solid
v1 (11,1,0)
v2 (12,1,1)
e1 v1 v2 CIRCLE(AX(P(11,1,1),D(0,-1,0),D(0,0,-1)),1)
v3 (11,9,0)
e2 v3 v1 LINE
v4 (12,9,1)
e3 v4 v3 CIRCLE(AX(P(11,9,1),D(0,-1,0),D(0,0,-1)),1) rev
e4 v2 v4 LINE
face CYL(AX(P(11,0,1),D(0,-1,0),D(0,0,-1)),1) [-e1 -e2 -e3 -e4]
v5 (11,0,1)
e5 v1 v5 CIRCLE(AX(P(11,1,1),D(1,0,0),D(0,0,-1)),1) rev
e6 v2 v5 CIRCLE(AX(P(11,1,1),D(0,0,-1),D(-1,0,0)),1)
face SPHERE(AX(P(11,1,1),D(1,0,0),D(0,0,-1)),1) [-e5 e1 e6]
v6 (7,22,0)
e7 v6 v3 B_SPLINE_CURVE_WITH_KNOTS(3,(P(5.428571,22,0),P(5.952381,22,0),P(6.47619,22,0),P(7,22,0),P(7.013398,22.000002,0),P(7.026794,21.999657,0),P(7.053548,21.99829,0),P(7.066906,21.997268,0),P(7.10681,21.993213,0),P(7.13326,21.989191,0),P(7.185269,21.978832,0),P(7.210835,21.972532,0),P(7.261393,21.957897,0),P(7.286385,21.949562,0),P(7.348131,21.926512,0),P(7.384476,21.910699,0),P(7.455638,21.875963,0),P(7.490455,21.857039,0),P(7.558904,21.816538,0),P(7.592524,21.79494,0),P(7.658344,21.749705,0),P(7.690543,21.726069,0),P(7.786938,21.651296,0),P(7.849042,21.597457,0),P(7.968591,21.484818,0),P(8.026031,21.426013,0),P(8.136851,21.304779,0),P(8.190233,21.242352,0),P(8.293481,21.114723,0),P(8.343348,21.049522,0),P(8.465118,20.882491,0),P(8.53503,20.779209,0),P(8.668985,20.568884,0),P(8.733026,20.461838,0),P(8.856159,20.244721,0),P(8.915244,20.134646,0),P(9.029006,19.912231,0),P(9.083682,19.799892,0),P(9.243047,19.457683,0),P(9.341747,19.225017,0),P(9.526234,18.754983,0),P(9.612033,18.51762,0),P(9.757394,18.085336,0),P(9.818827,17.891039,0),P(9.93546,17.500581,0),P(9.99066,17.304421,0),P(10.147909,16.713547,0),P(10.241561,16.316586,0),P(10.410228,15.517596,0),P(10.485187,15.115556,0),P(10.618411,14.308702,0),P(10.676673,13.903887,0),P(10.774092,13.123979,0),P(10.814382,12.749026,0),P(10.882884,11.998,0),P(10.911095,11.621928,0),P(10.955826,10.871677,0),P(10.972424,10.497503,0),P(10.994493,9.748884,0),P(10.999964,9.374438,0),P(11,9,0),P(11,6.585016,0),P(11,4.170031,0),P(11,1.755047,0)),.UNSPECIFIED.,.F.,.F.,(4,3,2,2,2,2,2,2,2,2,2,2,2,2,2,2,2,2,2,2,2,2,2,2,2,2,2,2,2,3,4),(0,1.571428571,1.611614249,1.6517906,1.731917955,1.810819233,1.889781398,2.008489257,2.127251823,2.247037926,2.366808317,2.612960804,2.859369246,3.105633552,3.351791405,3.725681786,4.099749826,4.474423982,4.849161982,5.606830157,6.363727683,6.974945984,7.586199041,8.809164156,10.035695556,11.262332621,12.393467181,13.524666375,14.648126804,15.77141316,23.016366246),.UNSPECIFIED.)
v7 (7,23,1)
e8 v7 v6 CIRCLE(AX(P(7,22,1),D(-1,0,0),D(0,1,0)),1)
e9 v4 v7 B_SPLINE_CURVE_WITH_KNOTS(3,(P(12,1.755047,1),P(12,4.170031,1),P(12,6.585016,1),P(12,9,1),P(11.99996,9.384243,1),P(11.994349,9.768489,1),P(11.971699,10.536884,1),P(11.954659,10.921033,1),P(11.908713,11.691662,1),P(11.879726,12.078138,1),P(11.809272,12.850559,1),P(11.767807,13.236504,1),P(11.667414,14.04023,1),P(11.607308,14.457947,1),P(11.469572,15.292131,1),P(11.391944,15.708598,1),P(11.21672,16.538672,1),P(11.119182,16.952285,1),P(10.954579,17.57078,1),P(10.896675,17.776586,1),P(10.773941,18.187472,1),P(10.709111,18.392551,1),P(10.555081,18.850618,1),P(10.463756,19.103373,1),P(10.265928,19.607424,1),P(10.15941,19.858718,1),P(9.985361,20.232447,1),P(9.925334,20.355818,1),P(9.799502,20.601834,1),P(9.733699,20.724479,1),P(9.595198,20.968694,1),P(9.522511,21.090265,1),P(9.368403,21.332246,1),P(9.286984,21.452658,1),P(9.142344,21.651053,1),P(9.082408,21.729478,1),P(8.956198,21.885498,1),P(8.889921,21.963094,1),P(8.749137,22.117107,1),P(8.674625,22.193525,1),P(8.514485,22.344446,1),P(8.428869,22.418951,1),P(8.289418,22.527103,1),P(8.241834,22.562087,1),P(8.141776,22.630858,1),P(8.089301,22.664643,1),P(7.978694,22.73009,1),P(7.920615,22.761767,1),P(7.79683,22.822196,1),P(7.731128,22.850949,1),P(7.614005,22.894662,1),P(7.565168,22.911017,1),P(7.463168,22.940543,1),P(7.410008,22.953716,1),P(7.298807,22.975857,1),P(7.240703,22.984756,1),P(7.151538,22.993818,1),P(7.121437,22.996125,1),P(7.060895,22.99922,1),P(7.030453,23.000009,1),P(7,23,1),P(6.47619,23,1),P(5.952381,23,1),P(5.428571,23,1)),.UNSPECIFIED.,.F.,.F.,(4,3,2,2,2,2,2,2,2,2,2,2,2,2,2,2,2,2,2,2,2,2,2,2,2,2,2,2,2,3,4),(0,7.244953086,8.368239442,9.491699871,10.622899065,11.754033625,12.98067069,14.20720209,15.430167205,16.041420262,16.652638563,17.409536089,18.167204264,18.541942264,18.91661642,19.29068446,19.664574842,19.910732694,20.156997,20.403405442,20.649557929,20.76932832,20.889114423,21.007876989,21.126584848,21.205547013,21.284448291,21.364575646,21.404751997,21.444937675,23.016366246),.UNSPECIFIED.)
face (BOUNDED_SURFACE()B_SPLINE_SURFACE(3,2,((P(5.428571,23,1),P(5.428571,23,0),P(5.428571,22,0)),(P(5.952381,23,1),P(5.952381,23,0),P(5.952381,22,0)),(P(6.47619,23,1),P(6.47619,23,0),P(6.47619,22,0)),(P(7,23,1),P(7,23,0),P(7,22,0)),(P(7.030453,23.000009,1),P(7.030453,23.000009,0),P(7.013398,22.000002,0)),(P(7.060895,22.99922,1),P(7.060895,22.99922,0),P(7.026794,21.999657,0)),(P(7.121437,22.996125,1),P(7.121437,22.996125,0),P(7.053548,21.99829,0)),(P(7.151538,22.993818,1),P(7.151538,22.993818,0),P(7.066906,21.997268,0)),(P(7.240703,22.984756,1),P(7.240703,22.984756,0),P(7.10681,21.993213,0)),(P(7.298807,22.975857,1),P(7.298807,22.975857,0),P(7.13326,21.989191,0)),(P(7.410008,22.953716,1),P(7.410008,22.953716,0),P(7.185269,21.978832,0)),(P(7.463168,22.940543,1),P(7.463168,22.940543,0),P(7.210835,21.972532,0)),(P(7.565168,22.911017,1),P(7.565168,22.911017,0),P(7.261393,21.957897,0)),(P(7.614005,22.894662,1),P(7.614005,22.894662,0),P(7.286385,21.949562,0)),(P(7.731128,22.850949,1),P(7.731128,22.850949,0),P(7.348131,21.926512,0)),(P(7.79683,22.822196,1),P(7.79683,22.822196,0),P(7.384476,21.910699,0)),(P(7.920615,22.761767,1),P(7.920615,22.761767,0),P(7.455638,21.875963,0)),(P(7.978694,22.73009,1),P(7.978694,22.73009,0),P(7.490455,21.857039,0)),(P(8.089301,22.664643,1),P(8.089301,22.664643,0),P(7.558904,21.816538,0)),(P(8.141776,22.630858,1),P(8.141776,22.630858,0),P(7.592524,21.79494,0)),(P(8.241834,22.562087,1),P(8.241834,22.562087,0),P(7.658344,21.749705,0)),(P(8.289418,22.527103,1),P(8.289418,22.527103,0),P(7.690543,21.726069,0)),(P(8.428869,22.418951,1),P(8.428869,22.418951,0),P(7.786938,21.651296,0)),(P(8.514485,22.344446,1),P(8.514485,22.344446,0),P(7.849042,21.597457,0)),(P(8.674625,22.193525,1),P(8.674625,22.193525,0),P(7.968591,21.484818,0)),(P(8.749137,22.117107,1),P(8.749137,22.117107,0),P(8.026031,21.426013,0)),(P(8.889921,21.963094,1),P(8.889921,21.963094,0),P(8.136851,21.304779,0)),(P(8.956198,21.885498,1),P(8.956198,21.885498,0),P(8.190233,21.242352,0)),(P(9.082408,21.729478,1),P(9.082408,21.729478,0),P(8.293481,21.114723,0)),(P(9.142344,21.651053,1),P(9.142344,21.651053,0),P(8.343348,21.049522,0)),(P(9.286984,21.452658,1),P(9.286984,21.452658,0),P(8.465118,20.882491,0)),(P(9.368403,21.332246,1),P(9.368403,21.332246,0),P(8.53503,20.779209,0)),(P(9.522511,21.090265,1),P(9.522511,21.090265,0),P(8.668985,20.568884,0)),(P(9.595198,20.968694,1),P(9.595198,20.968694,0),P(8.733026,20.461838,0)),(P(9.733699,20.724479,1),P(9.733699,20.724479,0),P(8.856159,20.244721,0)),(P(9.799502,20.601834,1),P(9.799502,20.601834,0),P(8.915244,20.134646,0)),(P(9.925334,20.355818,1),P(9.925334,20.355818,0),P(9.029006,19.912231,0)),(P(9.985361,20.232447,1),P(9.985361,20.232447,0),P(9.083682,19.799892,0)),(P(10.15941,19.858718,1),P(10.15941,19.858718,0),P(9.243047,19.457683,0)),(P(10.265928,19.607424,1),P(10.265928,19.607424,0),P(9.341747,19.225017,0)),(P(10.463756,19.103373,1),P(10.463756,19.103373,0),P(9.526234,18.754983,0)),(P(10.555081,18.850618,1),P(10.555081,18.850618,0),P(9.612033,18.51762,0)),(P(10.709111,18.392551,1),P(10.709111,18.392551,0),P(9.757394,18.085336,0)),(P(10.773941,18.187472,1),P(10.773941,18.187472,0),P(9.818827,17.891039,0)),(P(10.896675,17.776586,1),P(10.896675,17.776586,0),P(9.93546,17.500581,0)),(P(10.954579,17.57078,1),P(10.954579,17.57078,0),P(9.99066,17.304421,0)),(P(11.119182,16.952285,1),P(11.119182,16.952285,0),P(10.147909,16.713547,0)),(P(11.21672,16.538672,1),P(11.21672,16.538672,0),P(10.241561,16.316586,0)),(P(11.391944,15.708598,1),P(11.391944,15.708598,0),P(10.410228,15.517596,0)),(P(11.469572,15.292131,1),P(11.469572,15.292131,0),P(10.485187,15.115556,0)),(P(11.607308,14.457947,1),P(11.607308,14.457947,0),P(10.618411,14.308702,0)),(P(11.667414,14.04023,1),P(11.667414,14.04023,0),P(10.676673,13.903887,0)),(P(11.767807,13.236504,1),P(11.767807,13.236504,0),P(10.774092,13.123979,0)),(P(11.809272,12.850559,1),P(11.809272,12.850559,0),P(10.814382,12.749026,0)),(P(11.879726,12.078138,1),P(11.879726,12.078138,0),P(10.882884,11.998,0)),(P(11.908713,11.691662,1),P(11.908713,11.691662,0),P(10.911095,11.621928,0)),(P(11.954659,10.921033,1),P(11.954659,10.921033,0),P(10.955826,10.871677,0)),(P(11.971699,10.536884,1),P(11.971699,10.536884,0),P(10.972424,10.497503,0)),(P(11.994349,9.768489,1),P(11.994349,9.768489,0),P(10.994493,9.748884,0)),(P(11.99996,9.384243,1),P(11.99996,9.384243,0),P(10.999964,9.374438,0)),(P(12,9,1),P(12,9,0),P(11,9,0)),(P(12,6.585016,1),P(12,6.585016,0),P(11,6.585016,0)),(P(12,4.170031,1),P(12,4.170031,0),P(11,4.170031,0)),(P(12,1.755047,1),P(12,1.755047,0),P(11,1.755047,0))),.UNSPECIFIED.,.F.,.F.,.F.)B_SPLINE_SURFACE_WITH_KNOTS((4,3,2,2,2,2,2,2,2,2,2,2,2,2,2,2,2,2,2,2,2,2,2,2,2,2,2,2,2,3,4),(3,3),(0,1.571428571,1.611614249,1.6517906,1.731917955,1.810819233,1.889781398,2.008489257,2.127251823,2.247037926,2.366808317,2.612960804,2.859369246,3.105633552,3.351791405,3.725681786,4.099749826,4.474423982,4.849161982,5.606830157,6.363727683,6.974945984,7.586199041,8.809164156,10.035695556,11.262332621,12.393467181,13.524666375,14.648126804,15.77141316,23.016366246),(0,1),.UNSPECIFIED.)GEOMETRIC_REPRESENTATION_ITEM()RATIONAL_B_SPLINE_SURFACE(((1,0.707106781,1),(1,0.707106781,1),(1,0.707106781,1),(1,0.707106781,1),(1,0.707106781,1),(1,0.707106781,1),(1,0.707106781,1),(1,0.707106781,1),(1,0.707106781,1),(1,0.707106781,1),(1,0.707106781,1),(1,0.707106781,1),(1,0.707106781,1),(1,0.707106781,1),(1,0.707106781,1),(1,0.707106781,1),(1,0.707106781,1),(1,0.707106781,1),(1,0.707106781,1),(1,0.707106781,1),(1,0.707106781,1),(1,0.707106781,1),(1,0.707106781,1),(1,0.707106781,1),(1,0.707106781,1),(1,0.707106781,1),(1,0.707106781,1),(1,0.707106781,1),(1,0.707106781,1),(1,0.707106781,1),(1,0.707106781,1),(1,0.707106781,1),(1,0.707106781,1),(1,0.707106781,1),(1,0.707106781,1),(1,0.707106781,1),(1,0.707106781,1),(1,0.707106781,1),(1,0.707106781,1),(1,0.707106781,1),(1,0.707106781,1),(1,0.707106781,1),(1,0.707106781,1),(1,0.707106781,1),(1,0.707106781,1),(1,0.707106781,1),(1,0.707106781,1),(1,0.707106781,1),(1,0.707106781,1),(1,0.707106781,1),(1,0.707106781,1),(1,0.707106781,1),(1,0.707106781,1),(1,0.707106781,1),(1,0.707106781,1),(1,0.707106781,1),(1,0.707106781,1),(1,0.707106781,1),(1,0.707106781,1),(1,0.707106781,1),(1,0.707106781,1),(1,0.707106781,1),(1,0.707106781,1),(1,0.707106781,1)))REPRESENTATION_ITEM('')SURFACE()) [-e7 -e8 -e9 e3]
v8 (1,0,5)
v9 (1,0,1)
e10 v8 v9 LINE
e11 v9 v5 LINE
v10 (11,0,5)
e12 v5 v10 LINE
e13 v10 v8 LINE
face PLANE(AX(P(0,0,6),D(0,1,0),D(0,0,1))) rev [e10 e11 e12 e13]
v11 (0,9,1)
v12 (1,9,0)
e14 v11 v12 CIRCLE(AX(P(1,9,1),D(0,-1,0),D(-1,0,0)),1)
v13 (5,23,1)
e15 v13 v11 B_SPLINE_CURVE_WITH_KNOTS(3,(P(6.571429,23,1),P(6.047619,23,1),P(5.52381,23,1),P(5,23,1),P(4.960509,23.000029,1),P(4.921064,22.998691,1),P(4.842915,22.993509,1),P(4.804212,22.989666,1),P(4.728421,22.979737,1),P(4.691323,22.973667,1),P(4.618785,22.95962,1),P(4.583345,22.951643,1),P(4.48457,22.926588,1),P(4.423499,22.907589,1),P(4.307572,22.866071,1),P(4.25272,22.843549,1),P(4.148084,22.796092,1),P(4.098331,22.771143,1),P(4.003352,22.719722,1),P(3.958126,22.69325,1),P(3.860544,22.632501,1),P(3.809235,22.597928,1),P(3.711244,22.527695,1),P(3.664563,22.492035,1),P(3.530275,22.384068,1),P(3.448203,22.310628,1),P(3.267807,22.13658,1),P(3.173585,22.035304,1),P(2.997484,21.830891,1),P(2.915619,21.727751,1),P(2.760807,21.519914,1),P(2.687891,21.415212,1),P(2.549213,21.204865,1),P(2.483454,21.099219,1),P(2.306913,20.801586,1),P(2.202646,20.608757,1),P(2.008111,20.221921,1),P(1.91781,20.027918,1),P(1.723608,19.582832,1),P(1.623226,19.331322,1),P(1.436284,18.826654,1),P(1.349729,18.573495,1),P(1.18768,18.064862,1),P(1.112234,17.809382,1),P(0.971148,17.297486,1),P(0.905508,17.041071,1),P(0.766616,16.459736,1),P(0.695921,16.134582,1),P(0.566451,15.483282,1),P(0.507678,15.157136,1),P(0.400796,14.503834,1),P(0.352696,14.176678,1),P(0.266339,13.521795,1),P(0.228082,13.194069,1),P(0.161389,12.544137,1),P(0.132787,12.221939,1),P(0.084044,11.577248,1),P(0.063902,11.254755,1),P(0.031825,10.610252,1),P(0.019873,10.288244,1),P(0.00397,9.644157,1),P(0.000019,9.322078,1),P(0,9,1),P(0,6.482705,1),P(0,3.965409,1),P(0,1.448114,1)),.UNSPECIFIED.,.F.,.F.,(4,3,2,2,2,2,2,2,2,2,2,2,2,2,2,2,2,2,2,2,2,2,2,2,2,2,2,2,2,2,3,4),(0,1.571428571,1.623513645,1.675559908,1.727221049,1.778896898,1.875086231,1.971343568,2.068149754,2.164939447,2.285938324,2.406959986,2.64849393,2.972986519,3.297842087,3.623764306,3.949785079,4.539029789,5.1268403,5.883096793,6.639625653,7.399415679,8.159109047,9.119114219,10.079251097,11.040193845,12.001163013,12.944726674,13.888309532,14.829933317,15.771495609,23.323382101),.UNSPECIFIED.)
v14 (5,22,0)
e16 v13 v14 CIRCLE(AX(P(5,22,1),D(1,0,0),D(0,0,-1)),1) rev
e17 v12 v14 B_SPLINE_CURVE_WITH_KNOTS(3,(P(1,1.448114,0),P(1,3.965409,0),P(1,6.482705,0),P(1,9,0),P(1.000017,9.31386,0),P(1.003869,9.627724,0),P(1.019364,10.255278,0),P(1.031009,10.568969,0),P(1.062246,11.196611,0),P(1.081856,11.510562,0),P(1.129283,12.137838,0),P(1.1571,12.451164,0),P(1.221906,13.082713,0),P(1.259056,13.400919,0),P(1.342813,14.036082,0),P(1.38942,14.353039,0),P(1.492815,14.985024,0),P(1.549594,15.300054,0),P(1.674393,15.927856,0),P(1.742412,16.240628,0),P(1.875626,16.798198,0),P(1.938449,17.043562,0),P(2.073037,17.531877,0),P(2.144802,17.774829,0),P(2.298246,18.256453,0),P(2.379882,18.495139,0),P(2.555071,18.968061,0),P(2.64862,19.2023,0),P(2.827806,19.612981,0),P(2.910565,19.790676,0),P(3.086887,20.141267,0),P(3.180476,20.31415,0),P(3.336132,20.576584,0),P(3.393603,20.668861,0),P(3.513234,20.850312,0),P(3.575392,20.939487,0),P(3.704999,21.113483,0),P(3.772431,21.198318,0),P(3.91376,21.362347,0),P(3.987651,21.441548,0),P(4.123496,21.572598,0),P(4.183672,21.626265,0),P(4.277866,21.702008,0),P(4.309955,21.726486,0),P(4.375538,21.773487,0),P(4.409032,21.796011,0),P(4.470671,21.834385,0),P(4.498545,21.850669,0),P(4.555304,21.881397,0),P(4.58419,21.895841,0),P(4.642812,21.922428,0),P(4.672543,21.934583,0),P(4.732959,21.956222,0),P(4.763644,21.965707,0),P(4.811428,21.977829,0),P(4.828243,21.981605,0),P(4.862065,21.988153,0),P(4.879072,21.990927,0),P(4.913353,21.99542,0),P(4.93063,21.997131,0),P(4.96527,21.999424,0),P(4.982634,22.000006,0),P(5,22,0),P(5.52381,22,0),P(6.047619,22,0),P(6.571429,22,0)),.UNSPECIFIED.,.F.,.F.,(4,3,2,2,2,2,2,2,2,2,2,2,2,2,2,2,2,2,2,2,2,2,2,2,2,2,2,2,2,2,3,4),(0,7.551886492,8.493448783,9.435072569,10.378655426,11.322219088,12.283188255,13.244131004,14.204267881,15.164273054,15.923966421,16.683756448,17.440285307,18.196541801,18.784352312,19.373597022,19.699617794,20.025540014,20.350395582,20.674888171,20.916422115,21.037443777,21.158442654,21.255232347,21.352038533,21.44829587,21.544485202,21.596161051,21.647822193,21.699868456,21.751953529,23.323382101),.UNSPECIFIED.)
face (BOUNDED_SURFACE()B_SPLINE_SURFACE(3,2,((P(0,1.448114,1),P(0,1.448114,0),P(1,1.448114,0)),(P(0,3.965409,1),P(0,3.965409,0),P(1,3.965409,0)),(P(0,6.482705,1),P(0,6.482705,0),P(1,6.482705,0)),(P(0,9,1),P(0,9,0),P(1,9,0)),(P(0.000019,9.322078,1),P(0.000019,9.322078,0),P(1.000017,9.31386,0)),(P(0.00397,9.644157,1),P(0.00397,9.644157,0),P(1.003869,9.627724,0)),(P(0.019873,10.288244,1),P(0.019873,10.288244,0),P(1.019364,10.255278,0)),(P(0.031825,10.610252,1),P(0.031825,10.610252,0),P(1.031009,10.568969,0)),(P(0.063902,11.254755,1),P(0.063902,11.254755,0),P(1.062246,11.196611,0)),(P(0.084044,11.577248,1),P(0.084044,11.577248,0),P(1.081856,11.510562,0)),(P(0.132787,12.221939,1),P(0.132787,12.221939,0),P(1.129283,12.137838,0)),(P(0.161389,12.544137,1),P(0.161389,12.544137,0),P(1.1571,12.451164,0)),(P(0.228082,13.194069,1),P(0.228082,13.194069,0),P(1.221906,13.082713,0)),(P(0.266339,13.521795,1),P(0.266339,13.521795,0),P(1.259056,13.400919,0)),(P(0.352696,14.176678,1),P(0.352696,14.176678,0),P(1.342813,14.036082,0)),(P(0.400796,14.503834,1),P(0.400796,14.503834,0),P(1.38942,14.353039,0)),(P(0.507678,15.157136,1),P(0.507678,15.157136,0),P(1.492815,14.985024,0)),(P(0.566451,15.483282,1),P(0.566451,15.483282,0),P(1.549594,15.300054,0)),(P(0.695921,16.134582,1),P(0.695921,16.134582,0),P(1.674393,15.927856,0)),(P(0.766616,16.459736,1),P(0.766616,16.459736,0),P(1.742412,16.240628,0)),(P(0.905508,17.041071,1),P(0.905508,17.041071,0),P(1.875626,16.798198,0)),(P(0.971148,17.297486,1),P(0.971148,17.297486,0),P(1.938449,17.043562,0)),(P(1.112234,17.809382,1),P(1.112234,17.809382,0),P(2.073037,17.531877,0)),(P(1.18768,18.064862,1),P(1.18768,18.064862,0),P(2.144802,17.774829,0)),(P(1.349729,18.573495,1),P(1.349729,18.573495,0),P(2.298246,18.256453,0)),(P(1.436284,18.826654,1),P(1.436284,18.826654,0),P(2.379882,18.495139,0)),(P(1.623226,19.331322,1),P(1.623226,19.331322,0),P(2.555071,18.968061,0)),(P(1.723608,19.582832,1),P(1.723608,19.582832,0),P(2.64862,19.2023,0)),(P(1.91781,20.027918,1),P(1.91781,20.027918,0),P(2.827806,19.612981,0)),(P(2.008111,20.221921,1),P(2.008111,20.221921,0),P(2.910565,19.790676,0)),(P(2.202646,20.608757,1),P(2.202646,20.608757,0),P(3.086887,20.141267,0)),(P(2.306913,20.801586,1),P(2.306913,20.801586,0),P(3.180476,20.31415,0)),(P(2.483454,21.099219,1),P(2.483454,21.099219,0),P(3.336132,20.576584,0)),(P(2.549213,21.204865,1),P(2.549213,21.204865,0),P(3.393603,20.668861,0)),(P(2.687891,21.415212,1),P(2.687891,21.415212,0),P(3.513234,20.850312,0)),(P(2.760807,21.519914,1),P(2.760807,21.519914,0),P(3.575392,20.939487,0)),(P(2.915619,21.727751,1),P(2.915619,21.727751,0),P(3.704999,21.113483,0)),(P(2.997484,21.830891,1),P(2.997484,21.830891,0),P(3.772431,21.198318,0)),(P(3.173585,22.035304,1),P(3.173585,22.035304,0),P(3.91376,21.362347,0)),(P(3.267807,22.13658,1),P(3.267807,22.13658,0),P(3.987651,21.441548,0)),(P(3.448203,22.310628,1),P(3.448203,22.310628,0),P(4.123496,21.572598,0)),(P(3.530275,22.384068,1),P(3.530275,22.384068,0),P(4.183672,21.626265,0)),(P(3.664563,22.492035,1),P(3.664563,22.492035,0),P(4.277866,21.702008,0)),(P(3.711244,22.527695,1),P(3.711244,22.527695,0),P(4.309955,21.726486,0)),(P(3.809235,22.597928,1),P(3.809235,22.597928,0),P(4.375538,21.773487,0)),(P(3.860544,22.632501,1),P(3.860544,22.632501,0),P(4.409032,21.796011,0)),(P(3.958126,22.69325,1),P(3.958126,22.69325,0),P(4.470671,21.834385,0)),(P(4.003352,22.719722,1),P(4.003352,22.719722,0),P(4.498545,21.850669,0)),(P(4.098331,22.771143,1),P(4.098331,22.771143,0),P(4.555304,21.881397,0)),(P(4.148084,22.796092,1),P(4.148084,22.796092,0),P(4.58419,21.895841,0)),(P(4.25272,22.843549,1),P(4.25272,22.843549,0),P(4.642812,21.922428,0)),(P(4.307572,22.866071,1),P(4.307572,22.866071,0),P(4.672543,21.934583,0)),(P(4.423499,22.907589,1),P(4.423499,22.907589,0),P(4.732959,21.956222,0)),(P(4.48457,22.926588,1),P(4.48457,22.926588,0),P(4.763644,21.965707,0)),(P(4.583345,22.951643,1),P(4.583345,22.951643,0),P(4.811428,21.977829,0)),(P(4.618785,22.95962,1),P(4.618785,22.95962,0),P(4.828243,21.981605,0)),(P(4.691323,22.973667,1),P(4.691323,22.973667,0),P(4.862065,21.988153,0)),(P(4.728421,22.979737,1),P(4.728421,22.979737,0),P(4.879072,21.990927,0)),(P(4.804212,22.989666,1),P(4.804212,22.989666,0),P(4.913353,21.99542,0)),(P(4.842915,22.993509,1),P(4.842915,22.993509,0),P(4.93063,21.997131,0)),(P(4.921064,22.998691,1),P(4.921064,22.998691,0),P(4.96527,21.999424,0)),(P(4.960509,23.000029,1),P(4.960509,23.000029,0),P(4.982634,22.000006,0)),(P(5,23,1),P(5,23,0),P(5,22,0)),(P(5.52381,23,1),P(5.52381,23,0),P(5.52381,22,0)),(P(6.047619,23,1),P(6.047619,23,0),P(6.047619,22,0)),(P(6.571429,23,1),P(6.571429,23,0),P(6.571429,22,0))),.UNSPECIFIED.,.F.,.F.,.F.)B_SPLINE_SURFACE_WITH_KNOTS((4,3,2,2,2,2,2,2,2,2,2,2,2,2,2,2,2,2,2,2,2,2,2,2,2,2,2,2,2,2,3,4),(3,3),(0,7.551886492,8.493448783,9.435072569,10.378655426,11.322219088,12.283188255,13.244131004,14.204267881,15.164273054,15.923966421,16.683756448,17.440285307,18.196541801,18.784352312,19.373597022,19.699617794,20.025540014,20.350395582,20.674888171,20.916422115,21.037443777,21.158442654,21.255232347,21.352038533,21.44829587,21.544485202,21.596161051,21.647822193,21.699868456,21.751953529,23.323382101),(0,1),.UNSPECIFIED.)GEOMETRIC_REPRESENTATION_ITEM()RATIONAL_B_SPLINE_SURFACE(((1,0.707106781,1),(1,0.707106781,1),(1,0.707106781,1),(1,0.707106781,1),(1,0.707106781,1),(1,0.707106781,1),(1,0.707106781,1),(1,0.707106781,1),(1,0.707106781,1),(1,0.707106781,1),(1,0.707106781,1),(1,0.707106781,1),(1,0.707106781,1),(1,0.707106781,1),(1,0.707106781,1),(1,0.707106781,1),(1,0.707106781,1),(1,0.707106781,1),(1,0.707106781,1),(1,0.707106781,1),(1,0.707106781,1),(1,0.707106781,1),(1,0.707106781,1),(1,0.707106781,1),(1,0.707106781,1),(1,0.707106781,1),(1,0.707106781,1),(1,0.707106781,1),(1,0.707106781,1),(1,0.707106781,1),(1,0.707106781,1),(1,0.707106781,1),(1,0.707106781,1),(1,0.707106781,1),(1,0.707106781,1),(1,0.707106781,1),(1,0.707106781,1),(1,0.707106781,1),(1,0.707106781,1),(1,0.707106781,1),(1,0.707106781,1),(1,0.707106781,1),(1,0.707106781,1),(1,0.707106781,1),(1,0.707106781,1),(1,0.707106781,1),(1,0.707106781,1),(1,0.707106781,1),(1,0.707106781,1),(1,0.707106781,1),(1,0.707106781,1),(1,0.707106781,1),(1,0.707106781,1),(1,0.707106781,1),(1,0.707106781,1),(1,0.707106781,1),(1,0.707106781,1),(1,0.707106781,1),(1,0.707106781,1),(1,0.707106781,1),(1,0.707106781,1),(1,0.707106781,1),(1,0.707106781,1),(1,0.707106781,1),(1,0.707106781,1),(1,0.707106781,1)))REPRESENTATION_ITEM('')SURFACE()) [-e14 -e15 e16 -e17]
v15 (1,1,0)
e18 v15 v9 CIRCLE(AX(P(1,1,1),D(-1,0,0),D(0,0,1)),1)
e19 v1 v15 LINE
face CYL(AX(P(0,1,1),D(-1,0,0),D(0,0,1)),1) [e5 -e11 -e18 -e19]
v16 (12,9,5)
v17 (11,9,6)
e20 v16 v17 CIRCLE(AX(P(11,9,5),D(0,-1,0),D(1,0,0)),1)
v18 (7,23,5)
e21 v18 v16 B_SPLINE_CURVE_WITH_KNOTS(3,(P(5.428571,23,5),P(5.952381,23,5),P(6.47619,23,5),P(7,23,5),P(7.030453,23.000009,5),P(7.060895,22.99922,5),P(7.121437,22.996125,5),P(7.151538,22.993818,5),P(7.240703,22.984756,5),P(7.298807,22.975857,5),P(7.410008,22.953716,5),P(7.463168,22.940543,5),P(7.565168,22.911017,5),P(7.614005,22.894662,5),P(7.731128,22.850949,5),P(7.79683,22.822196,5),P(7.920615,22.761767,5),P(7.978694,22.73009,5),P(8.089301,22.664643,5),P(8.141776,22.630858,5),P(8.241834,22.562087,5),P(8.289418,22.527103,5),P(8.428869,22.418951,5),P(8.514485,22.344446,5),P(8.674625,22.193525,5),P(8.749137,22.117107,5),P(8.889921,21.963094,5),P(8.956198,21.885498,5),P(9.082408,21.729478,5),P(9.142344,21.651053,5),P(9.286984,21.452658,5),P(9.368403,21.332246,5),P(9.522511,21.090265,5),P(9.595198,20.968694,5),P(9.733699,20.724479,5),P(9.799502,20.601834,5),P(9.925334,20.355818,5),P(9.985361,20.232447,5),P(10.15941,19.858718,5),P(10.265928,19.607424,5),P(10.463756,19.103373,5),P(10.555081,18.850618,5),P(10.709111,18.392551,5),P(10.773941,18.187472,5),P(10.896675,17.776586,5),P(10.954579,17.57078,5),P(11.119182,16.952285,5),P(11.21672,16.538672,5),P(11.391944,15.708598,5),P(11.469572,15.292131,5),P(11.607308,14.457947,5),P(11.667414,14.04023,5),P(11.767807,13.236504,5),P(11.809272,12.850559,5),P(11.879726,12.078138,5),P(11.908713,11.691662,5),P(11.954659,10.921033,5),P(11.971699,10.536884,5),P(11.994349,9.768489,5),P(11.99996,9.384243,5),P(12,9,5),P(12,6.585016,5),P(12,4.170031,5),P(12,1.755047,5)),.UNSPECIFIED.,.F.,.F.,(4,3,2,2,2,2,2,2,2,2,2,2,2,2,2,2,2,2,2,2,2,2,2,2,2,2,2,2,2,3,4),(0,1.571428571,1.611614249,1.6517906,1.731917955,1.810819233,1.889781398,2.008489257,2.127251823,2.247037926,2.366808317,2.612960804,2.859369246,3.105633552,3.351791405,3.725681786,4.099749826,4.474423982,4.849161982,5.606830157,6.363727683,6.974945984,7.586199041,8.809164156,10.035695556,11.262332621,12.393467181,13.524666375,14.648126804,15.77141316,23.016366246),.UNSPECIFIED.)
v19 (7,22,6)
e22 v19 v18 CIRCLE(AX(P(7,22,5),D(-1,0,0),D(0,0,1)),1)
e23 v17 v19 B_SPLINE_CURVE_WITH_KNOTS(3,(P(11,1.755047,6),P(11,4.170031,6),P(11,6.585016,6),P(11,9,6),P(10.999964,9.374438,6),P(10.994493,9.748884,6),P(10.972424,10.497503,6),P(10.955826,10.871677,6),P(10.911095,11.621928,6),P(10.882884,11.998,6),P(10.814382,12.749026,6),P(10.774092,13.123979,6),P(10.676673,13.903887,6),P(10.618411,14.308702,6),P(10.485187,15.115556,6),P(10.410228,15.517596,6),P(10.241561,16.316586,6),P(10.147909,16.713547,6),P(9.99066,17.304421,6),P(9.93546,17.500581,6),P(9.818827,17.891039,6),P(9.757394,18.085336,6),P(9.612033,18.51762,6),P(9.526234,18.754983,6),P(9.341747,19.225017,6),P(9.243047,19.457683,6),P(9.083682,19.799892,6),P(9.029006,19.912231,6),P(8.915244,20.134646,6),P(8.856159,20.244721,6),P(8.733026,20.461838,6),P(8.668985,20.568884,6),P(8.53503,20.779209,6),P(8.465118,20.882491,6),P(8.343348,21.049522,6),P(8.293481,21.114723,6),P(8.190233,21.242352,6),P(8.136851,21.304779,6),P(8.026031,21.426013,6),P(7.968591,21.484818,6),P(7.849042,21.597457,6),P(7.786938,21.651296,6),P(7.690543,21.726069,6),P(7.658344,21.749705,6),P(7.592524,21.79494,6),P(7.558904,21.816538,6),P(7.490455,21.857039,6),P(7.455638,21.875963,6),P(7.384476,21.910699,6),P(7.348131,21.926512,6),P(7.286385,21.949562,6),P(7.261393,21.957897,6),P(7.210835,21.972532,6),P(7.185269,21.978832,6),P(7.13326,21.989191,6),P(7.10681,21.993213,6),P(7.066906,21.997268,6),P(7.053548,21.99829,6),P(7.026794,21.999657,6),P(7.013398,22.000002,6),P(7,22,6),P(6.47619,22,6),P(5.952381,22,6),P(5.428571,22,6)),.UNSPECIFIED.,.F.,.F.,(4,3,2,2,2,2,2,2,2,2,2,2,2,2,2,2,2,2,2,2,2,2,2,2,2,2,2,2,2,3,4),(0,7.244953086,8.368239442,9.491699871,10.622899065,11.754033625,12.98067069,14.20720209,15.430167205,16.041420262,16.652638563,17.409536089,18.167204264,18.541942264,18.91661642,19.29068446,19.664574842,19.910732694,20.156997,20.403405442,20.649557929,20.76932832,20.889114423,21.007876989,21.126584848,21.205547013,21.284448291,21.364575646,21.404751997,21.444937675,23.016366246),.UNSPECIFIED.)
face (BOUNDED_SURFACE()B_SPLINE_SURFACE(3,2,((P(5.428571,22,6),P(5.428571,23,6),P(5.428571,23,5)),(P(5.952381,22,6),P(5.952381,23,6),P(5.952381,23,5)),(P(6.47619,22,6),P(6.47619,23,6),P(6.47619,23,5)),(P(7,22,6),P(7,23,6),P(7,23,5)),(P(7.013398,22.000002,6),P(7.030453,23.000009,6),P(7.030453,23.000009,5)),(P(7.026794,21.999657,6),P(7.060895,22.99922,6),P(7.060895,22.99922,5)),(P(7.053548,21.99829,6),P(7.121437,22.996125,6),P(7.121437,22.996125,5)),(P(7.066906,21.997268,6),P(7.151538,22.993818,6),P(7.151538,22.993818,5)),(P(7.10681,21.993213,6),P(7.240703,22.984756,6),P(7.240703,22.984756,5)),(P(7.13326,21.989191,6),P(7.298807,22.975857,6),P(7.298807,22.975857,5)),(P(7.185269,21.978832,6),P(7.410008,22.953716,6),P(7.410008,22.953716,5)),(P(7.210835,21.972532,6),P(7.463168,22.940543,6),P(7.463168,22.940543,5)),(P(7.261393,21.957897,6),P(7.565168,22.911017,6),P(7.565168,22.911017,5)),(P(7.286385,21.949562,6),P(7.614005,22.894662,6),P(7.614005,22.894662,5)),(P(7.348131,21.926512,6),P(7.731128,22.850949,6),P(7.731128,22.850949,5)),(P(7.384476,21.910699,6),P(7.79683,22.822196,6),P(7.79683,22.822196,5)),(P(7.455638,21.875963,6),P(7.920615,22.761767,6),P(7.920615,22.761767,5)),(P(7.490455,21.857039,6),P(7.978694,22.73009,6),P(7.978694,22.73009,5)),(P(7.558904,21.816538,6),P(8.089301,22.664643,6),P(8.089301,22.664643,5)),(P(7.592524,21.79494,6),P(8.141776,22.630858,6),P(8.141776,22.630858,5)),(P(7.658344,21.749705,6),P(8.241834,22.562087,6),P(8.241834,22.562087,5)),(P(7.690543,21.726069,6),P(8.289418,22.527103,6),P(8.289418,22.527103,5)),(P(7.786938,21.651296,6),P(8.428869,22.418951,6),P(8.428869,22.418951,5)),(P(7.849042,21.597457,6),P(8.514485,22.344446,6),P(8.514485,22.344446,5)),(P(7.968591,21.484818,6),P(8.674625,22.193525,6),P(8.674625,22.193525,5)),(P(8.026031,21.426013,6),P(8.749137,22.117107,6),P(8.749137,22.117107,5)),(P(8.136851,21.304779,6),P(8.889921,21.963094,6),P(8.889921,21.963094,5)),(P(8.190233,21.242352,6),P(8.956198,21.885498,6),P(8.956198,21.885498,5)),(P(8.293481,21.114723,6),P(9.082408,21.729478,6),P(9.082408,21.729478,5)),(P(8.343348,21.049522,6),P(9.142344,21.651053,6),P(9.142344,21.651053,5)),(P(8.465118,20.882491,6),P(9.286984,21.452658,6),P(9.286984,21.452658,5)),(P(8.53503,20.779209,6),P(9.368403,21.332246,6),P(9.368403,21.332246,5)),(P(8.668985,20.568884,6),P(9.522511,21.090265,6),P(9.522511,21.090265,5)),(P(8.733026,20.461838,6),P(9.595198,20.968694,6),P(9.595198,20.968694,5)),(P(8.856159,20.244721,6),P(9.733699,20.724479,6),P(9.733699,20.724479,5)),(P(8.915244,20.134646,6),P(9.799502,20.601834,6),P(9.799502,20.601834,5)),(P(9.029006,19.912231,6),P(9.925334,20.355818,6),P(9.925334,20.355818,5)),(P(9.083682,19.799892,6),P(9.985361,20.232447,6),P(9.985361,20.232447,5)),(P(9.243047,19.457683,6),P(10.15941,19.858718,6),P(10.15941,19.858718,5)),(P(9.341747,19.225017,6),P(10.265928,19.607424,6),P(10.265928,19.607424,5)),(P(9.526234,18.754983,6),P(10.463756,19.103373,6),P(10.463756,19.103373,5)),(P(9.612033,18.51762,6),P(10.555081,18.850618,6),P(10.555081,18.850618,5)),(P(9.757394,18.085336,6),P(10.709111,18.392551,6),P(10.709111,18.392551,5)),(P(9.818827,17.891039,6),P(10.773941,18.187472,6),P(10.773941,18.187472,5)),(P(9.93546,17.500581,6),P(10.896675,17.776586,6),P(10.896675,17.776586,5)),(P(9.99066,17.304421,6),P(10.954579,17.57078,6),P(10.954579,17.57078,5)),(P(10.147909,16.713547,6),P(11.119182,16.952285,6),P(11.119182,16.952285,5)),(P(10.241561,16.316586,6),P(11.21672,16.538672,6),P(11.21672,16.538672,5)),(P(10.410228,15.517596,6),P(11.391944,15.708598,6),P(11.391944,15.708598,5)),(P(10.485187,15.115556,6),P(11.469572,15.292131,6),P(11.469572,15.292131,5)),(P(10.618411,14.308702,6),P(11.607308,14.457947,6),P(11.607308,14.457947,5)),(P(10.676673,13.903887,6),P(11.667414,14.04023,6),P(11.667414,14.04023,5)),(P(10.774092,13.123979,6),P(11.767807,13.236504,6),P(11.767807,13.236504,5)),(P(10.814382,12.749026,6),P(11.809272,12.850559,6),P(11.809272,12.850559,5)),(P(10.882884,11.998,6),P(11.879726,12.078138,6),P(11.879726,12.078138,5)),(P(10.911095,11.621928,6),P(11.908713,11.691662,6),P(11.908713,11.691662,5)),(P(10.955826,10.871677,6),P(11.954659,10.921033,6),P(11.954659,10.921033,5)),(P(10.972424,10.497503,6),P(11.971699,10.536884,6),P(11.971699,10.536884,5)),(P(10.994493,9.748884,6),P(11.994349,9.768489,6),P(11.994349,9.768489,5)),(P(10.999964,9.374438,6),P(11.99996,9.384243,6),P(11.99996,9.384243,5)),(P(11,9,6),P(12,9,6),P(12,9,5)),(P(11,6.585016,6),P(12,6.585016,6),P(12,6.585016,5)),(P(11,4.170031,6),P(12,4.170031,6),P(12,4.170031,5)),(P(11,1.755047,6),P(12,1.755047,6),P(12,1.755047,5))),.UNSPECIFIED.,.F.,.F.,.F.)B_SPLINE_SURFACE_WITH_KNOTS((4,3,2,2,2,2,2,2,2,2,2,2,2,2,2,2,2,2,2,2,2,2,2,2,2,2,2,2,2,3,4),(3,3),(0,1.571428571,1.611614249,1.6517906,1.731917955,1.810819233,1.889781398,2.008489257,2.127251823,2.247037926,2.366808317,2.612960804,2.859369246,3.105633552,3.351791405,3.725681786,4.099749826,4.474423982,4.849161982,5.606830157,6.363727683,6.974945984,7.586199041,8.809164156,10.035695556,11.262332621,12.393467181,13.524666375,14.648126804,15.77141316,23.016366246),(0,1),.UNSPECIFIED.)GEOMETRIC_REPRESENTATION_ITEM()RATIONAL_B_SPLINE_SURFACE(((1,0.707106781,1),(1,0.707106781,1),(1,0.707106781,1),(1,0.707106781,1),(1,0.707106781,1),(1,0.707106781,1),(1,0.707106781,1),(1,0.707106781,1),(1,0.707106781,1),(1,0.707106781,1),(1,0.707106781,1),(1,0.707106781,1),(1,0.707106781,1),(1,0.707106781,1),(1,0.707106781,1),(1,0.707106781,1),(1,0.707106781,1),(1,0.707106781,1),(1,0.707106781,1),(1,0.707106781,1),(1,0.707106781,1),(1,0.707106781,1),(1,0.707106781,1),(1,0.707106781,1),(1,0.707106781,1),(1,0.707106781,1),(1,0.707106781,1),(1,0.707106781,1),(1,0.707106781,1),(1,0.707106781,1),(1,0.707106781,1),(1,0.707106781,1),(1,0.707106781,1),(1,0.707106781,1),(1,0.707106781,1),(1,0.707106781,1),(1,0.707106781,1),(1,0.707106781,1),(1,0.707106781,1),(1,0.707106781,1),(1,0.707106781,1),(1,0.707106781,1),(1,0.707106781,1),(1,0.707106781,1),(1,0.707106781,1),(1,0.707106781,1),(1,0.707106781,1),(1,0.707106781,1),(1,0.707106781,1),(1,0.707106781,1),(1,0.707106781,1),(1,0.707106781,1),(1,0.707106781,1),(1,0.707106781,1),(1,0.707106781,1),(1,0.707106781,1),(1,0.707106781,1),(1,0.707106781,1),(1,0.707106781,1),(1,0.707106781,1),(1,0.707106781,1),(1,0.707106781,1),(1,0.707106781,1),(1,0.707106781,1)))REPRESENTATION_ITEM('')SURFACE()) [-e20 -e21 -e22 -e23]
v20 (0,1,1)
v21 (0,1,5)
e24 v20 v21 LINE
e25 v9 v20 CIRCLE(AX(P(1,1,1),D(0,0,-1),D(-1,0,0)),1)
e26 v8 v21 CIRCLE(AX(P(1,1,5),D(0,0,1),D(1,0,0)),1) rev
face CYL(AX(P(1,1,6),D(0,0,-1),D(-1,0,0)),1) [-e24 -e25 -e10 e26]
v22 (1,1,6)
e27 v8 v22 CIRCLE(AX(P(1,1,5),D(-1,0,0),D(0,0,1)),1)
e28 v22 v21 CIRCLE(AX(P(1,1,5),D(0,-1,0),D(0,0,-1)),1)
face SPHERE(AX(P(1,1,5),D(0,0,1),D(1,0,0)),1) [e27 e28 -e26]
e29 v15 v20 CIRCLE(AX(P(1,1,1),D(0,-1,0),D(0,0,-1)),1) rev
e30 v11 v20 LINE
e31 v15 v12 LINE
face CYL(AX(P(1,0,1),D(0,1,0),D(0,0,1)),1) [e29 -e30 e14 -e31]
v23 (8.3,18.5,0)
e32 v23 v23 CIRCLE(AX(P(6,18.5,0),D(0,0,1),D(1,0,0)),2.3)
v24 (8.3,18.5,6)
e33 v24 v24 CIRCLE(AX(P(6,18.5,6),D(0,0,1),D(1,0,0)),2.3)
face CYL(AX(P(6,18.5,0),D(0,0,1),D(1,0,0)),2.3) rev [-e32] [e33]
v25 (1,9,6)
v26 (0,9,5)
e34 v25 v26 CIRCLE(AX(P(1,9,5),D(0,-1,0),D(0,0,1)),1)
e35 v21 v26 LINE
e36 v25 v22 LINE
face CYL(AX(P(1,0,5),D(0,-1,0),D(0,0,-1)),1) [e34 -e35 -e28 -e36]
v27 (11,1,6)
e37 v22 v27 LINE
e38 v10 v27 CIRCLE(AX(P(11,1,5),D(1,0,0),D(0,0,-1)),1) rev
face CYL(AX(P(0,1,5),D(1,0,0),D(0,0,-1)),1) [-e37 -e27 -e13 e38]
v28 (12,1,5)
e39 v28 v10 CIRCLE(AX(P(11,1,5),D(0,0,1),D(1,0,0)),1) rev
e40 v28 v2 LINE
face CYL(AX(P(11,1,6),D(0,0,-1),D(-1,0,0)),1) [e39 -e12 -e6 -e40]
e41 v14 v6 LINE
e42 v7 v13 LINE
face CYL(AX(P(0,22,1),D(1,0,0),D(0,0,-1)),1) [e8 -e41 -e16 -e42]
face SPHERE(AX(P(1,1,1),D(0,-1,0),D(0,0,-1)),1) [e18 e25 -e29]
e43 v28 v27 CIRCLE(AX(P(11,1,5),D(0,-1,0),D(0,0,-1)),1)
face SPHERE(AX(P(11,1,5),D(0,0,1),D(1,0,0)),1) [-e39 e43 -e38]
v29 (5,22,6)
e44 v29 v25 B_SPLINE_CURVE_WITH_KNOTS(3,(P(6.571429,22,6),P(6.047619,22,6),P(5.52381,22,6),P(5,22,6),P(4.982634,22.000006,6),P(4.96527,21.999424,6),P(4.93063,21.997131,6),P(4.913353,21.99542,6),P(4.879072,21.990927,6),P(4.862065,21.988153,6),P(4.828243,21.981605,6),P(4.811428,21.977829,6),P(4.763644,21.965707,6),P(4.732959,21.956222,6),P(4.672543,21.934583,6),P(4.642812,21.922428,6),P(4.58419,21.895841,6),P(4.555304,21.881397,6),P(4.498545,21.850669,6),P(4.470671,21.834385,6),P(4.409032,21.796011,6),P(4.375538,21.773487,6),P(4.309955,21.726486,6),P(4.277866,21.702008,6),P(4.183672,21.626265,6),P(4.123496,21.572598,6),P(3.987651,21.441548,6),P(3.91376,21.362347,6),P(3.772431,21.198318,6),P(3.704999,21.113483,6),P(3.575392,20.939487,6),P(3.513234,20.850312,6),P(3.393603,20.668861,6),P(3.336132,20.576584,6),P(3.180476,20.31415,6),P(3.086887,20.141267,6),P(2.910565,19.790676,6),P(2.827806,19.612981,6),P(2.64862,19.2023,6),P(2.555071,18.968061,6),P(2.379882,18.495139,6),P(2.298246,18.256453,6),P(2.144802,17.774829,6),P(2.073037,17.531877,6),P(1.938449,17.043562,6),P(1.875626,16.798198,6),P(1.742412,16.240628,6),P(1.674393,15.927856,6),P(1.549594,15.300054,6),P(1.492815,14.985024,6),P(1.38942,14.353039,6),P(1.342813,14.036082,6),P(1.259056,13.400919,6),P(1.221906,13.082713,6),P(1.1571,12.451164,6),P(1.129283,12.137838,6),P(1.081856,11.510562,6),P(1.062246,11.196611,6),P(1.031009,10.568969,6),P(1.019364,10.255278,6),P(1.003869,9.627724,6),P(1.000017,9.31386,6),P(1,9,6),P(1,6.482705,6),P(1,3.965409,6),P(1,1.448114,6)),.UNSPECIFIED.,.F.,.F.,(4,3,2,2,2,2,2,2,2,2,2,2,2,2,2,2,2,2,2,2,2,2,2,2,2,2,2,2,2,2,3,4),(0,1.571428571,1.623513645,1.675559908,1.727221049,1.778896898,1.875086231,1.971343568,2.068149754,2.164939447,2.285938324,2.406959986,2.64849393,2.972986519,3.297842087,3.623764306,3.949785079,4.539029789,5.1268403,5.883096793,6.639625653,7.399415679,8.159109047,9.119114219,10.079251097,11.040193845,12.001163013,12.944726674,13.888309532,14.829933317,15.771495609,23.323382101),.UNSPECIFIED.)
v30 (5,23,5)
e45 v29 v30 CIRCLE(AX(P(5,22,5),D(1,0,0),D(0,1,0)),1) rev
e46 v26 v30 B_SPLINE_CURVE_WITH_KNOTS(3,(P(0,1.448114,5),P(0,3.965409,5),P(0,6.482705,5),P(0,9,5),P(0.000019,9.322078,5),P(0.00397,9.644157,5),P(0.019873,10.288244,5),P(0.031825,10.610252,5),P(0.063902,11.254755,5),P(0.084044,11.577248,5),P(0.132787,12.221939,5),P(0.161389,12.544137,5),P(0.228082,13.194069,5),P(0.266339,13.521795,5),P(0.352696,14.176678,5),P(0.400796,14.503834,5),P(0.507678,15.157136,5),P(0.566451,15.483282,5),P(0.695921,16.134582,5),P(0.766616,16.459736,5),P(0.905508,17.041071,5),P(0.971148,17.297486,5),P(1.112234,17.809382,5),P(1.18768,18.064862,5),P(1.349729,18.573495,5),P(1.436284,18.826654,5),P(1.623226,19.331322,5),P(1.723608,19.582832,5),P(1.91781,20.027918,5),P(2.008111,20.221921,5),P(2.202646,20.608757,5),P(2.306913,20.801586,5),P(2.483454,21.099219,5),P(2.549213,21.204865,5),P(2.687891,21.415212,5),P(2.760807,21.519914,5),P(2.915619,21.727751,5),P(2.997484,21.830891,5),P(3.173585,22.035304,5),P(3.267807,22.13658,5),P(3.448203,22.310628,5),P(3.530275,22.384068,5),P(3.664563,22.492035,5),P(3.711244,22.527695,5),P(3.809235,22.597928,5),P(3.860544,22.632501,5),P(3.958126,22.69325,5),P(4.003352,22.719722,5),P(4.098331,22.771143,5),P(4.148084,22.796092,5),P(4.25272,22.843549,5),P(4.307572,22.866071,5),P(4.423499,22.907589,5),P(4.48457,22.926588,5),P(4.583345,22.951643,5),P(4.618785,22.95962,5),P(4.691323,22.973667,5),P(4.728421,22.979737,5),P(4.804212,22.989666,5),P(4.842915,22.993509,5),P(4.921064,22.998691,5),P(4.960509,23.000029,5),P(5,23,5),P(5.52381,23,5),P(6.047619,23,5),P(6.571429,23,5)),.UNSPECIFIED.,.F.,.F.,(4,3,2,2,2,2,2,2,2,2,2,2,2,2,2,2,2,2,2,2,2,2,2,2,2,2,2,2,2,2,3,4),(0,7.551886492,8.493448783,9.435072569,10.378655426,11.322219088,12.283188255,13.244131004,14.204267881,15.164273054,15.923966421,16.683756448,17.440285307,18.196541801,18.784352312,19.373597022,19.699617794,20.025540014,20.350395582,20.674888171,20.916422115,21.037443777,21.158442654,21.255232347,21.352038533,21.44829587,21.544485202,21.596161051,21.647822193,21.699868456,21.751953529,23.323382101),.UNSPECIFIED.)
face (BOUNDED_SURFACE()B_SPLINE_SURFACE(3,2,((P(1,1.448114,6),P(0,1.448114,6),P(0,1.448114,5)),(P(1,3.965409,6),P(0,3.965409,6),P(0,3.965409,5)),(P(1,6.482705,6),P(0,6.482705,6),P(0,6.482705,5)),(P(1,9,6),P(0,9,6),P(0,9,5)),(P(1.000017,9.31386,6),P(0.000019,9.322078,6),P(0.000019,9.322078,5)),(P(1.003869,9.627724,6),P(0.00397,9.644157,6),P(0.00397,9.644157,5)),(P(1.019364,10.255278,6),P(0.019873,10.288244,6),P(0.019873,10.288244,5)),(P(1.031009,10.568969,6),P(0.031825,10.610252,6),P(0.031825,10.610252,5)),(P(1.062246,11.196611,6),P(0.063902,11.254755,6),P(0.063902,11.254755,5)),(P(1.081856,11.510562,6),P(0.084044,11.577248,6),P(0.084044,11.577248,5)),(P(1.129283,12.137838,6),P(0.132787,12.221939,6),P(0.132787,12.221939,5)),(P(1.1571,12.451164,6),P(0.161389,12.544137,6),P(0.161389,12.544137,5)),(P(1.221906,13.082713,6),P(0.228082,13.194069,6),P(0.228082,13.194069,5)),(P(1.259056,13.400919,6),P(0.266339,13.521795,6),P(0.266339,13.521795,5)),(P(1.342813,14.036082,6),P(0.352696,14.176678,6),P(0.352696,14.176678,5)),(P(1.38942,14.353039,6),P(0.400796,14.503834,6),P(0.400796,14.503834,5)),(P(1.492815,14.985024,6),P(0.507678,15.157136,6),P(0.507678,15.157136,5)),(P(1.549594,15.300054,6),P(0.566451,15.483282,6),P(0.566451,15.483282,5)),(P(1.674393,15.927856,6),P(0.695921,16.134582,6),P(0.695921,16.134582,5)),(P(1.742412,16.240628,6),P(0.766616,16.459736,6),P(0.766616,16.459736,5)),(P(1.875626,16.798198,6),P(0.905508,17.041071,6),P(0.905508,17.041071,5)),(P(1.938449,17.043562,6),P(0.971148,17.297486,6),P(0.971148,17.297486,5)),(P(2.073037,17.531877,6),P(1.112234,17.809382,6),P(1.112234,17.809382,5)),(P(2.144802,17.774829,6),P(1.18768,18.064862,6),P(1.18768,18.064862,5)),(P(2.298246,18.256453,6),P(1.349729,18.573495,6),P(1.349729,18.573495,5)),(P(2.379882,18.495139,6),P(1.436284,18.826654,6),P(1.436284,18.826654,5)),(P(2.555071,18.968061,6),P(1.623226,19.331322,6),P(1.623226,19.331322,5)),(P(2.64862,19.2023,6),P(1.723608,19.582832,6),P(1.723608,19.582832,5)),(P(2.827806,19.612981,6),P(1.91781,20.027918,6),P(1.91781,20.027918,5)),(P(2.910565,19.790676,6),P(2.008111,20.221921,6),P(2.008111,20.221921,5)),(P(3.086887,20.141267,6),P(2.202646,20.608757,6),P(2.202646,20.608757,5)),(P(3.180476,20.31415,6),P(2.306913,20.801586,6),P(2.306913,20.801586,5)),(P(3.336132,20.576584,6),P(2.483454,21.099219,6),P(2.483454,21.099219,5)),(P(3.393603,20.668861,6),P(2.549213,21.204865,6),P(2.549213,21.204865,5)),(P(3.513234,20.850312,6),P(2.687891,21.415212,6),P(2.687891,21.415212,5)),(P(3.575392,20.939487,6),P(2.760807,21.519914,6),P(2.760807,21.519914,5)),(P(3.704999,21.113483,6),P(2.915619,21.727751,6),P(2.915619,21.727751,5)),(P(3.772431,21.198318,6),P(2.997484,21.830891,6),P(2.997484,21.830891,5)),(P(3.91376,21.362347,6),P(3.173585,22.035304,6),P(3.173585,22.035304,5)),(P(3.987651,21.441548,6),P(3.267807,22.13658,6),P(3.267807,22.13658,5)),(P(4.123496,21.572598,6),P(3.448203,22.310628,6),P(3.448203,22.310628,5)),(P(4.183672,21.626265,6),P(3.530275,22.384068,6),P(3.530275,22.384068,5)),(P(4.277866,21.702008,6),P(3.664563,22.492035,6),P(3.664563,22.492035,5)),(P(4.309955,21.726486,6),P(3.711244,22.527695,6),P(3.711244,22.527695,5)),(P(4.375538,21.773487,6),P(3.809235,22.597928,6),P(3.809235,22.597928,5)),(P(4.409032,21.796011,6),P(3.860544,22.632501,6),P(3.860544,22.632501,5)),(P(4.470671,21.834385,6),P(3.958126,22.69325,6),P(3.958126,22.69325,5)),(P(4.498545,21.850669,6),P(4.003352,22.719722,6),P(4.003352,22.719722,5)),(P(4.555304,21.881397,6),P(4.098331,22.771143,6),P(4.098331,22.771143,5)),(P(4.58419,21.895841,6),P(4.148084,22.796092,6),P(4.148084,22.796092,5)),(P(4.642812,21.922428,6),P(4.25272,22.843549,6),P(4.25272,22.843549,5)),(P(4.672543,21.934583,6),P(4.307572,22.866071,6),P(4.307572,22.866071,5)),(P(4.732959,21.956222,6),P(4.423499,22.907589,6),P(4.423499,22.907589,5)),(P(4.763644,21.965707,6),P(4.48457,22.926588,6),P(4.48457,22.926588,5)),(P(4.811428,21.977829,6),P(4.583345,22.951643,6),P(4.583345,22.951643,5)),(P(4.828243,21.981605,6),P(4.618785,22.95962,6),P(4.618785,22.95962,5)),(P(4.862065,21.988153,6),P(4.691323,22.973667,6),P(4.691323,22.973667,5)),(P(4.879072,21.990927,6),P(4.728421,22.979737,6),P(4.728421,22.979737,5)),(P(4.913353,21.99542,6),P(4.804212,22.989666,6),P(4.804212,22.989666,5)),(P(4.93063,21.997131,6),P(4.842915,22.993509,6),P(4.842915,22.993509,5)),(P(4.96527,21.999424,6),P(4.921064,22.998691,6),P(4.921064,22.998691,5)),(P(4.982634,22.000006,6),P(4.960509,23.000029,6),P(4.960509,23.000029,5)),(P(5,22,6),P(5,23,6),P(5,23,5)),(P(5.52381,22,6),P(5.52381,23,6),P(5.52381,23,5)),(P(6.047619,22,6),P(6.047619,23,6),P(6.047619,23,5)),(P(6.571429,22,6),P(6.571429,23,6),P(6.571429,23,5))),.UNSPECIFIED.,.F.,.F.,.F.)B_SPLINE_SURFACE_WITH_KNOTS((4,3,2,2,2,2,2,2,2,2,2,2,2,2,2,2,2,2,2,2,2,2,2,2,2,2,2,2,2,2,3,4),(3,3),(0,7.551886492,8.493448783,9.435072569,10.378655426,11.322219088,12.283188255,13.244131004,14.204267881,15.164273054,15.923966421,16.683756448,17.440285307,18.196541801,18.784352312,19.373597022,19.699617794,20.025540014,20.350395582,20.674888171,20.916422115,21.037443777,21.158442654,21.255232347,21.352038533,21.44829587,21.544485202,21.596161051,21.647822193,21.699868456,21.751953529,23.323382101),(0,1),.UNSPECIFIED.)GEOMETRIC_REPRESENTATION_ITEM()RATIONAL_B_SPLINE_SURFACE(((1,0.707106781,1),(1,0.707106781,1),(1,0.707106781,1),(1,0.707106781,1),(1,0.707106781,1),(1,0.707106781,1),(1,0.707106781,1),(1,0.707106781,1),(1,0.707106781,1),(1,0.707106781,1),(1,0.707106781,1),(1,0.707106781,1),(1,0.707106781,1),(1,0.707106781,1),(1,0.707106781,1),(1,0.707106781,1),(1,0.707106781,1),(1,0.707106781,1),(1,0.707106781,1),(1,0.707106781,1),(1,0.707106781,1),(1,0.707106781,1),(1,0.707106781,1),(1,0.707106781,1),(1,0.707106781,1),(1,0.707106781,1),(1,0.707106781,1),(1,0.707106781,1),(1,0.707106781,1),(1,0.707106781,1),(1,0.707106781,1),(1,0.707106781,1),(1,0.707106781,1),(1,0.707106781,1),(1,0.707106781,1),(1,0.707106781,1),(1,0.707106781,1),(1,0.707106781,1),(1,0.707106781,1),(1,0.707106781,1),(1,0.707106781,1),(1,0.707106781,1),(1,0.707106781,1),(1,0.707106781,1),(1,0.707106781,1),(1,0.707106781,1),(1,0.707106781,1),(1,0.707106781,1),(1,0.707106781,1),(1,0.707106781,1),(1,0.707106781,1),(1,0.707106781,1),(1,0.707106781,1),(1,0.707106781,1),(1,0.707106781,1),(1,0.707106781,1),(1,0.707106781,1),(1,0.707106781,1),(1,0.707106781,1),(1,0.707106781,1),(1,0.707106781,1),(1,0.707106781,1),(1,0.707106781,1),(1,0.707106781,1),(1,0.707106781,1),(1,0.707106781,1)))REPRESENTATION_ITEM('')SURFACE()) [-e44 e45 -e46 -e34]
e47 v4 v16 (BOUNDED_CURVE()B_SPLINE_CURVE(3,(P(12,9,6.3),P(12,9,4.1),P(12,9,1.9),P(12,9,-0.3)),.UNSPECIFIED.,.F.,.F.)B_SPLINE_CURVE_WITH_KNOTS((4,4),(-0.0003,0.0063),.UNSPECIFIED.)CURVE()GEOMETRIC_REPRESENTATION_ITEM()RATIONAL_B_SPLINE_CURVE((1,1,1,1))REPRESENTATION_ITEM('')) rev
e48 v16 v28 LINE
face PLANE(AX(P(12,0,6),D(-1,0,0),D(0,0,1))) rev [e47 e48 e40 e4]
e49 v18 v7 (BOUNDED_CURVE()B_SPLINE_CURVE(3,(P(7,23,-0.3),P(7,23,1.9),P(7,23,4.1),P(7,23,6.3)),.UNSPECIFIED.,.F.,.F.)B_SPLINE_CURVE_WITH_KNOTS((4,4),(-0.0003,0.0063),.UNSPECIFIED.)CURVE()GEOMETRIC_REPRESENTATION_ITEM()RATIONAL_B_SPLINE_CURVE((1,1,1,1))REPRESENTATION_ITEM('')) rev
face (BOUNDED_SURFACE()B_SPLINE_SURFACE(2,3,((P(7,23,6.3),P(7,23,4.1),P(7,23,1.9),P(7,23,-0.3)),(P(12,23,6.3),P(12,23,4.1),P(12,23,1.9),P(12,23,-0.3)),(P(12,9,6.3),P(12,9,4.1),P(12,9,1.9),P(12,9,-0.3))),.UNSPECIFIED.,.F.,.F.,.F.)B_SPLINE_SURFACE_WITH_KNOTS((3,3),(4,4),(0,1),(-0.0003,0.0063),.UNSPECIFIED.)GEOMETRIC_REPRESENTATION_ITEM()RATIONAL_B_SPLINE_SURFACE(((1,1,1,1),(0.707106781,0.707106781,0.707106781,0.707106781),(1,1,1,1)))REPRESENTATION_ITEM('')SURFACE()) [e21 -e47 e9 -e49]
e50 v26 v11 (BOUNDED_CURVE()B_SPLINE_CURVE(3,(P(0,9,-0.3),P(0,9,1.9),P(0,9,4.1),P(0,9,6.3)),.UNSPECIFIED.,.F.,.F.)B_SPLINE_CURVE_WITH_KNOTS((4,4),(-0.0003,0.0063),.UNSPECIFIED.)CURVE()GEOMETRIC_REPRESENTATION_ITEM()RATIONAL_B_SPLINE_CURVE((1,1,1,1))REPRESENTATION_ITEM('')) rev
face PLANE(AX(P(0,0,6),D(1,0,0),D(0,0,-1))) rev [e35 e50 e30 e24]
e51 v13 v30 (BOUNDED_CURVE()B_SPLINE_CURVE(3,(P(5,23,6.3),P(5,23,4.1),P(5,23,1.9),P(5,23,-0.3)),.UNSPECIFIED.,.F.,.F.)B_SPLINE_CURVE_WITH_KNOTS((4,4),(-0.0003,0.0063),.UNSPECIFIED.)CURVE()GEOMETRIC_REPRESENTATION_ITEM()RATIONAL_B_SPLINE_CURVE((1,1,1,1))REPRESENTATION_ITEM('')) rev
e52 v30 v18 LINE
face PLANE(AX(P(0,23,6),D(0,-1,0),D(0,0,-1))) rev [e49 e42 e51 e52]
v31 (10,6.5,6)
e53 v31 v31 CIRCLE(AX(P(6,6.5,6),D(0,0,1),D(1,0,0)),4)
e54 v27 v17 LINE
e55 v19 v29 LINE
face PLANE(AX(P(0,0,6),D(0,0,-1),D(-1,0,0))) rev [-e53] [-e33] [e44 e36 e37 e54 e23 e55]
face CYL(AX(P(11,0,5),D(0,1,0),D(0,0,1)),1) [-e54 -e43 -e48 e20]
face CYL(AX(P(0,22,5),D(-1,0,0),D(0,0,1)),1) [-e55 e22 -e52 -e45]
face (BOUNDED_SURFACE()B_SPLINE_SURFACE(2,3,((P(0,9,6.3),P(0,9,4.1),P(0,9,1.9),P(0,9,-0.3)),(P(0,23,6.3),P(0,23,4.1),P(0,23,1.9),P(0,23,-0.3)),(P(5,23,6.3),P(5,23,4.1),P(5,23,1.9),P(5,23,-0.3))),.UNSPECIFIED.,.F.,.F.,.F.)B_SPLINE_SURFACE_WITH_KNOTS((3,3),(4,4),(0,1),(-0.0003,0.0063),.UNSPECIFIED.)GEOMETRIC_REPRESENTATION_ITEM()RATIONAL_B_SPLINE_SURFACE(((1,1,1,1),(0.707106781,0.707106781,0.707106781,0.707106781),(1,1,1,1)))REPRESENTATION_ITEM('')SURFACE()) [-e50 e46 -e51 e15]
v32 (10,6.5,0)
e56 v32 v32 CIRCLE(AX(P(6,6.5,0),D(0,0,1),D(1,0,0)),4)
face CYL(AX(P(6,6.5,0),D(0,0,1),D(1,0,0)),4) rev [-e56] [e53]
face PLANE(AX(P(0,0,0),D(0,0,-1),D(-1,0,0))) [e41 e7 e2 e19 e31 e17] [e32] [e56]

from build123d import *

# Parameters (mm, degrees)
SKETCH1_W            = 12
SKETCH1_H            = 23
BOSS_EXTRUDE1_DEPTH  = 6
SKETCH2_R            = 2.3
SKETCH2_R_2          = 4
CUT_EXTRUDE1_DEPTH   = 6
TAPER_FILLET_SIZE    = 14
TAPER_FILLET_SIZE_2  = 5
TAPER_FILLET2_SIZE   = 14
TAPER_FILLET2_SIZE_2 = 5
EDGE_FILLETS_R       = 1


with BuildPart() as part:
    # Sketch1 → Boss-Extrude1 (new body)
    with BuildSketch(Plane.XY):
        with Locations((6, 11.5)):
            Rectangle(SKETCH1_W, SKETCH1_H)
    extrude(amount=BOSS_EXTRUDE1_DEPTH)

    # Sketch2 → Cut-Extrude1 (cut)
    with BuildSketch(Plane.XY.offset(6)):
        with Locations((6, 18.5)):
            Circle(SKETCH2_R)
        with Locations((6, 6.5)):
            Circle(SKETCH2_R_2)
    extrude(amount=-CUT_EXTRUDE1_DEPTH, mode=Mode.SUBTRACT)

    # taper_fillet
    # an asymmetric fillet: 14, 5 mm, written as the material it takes off along each edge
    with BuildSketch(Plane(origin=(0, 23, -35), x_dir=(0, -1, 0), z_dir=(0, 0, 1))) as taper_fillet_piece_1:
        with BuildLine():
            Bezier((TAPER_FILLET_SIZE, 0), (0, 0), (0, TAPER_FILLET_SIZE_2), weights=[1, 0.707106781, 1])
            Line((0, TAPER_FILLET_SIZE_2), (0, 0))
            Line((0, 0), (TAPER_FILLET_SIZE, 0))
        make_face()
    extrude(amount=76, mode=Mode.SUBTRACT)

    # taper_fillet2
    # an asymmetric fillet: 14, 5 mm, written as the material it takes off along each edge
    with BuildSketch(Plane(origin=(12, 23, -35), x_dir=(0, -1, 0), z_dir=(0, 0, 1))) as taper_fillet2_piece_1:
        with BuildLine():
            Bezier((TAPER_FILLET2_SIZE, 0), (0, 0), (0, -TAPER_FILLET2_SIZE_2), weights=[1, 0.707106781, 1])
            Line((0, -TAPER_FILLET2_SIZE_2), (0, 0))
            Line((0, 0), (TAPER_FILLET2_SIZE, 0))
        make_face()
    extrude(amount=76, mode=Mode.SUBTRACT)

    # edge_fillets
    edge_fillets_edges = [part.edges().sort_by_distance(p)[0] for p in [
        (0, 4.5, 0),
        (0.853211897, 16.822053684, 0),
        (6, 23, 0),
        (12, 4.5, 0),
        (12, 4.5, 6),
        (0, 4.5, 6),
        (0.853211897, 16.822053684, 6),
        (6, 23, 6),
        (0, 0, 3),
        (6, 0, 6),
        (12, 0, 3),
        (6, 0, 0),
        (11.146788103, 16.822053684, 0),
        (11.146788103, 16.822053684, 6),
    ]]
    fillet(edge_fillets_edges, radius=EDGE_FILLETS_R)


solid = part.part
